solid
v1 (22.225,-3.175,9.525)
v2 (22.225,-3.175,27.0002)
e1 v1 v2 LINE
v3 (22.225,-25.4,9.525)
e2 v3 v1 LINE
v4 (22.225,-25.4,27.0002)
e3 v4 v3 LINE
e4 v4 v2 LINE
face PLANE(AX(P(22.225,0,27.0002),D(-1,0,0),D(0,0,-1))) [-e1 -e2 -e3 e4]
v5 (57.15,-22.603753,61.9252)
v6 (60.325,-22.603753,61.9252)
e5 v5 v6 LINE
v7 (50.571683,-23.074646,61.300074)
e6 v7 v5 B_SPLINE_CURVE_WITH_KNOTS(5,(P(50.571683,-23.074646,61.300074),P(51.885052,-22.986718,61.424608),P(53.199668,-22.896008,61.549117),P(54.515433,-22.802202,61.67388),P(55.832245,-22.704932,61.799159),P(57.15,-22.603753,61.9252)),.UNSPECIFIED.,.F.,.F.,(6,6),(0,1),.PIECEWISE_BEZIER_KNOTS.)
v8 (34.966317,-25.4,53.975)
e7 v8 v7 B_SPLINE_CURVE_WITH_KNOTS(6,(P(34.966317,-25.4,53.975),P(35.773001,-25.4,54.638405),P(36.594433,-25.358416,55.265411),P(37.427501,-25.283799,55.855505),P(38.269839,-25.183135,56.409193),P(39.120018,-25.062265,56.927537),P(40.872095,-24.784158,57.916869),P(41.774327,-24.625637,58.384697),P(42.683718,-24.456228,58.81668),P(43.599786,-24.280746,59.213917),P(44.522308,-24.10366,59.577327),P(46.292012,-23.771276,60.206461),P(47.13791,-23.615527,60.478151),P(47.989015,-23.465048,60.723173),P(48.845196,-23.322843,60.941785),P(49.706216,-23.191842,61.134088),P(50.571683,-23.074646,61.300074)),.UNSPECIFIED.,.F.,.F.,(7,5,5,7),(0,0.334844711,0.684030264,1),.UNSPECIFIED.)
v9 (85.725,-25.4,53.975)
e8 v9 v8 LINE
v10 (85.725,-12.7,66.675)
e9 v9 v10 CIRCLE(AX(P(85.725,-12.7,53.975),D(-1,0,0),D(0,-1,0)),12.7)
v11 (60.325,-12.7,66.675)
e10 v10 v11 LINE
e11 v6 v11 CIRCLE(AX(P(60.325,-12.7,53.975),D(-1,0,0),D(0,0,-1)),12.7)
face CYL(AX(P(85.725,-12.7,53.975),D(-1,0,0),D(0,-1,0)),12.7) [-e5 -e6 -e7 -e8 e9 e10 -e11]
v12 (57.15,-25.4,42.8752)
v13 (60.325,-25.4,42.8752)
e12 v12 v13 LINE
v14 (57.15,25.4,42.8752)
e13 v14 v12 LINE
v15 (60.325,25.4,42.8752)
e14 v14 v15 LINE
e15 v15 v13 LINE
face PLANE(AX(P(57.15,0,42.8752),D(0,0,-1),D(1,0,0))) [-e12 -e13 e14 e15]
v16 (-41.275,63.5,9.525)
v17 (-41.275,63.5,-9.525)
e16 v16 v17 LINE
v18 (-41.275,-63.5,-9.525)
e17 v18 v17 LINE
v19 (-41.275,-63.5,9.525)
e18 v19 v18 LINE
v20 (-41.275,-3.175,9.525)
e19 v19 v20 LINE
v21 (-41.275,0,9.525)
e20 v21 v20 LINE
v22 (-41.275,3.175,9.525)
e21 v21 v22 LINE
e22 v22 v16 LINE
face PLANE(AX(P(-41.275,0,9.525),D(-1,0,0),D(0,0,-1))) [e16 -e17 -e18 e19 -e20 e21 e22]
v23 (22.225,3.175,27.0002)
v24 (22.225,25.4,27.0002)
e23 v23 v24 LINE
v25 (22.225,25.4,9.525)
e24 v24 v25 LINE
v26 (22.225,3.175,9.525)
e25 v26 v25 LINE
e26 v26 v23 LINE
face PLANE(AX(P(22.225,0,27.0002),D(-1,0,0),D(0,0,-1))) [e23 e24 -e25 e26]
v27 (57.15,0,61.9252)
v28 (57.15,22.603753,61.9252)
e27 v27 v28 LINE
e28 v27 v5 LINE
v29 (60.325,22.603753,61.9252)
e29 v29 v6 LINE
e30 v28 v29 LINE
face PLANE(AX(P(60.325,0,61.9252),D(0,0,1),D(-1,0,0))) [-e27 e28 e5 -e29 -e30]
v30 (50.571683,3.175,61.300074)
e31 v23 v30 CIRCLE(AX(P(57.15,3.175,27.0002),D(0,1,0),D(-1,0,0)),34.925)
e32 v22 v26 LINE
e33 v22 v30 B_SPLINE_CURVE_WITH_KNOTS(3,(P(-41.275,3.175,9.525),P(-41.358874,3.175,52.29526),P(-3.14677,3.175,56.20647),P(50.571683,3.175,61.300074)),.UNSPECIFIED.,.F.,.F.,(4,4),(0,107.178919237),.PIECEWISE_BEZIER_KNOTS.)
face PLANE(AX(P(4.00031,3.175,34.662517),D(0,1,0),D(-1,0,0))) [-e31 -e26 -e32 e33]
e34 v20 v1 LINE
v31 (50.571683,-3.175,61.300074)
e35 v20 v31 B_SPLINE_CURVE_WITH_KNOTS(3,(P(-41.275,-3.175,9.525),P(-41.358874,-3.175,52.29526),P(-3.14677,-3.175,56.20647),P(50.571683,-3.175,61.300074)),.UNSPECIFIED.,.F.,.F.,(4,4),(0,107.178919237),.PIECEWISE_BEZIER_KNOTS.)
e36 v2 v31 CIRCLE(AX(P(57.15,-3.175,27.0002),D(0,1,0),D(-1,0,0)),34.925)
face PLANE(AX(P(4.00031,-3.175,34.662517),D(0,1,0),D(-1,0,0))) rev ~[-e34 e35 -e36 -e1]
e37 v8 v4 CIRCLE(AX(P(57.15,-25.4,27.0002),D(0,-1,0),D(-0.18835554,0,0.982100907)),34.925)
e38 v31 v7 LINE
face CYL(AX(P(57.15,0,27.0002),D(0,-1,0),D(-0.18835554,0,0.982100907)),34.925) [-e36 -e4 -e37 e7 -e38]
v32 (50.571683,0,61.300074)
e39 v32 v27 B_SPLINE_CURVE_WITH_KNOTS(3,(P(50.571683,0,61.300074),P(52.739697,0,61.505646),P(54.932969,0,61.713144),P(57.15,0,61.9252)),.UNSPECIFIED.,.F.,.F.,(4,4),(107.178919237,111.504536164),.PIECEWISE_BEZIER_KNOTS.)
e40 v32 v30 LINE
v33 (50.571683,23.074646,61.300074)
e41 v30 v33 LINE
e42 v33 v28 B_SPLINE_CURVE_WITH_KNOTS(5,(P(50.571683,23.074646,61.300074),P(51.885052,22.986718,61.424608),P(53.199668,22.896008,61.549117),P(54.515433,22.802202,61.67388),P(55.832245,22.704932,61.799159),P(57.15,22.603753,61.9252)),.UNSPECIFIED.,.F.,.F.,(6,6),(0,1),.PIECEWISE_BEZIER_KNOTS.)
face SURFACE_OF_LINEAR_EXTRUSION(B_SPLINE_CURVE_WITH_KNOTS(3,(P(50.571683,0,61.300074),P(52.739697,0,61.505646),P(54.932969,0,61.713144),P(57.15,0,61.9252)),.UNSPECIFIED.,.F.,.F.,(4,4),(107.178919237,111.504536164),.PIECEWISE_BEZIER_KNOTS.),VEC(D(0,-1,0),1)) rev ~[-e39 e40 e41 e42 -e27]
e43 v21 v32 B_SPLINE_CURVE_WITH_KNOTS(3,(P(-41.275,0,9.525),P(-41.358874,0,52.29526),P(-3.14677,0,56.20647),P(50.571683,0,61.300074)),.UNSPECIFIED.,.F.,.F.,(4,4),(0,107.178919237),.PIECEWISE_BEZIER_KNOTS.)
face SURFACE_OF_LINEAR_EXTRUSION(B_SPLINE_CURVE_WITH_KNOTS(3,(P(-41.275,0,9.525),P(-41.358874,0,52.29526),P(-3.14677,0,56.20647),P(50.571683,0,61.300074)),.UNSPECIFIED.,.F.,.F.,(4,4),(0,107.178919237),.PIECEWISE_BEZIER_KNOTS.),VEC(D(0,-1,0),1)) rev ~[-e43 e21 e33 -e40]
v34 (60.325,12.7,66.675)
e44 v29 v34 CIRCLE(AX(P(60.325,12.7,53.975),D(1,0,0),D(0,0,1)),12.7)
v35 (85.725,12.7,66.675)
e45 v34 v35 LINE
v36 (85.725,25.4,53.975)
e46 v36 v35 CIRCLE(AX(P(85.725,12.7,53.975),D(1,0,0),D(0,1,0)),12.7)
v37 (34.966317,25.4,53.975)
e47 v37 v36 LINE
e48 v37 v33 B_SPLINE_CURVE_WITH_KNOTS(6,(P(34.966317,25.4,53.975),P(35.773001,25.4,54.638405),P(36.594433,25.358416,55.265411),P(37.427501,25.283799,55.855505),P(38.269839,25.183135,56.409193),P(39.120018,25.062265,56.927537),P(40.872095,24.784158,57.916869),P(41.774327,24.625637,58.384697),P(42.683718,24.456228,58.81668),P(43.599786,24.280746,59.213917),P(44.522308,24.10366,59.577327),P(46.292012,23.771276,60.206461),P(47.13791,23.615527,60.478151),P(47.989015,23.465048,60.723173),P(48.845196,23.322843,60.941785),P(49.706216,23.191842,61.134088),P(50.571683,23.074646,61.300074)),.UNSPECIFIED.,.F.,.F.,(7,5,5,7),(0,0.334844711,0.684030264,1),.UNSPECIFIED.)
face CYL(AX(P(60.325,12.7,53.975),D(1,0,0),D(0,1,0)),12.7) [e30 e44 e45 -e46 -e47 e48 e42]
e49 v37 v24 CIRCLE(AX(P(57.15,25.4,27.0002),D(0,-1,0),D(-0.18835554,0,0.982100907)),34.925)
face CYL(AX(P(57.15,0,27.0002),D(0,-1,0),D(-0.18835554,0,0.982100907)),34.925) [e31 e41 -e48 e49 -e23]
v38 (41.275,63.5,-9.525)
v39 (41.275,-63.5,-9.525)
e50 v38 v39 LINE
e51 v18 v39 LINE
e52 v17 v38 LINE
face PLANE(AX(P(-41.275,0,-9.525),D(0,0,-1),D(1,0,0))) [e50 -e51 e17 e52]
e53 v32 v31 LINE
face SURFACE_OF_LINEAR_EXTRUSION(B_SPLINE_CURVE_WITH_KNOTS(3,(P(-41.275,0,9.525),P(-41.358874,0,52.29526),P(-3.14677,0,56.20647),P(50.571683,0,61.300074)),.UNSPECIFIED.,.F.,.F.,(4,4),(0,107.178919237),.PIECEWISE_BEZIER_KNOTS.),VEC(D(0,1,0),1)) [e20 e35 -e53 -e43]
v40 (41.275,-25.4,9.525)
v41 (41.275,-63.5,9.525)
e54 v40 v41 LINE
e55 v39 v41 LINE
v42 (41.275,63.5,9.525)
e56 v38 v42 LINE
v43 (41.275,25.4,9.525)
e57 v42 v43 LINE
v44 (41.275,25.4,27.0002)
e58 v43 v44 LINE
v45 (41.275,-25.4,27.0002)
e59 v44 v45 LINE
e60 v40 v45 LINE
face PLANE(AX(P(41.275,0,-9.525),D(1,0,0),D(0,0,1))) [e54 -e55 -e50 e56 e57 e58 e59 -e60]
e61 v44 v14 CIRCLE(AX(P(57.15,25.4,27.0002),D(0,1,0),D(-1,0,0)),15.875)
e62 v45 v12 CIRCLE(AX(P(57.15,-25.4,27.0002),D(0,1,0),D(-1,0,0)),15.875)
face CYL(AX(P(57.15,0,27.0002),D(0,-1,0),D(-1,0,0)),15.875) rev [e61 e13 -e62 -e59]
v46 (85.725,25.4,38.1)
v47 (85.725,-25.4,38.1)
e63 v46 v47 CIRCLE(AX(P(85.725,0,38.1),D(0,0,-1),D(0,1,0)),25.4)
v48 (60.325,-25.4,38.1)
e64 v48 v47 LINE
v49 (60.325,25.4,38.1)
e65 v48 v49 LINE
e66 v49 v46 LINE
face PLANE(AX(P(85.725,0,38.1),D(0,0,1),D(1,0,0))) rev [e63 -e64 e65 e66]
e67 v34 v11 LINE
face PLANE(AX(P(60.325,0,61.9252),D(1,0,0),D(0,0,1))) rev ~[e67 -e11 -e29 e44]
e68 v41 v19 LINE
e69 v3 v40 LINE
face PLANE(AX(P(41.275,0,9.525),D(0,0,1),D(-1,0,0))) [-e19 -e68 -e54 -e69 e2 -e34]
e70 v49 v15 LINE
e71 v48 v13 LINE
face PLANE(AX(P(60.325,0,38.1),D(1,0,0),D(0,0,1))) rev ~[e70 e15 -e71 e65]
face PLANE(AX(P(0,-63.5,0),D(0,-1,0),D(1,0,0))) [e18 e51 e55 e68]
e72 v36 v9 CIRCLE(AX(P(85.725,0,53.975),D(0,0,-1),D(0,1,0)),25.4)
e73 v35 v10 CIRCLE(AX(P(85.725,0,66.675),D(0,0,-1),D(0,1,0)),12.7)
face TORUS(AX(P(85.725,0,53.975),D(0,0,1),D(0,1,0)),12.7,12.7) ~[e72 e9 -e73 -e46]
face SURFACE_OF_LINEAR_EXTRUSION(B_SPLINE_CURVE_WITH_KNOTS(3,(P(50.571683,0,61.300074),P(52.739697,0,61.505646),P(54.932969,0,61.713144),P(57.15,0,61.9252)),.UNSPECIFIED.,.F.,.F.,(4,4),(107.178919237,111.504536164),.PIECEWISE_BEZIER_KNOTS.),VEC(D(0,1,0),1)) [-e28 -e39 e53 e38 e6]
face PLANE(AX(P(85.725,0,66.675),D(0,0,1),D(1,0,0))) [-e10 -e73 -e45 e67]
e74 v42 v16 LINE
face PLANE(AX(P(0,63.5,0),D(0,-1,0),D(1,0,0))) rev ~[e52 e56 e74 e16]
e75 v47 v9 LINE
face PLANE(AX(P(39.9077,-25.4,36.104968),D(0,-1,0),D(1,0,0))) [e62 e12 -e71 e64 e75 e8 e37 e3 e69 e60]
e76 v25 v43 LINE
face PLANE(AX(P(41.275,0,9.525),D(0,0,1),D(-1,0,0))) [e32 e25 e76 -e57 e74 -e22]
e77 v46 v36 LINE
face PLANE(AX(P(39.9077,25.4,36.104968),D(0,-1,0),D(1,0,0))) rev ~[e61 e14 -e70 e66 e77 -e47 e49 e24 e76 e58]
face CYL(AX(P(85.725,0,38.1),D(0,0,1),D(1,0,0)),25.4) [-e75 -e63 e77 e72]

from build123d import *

# Parameters (mm, degrees)
F1_DEPTH = 63.5
F0_W     = 25.4
F0_H     = 19.05
F0_H_2   = 4.7498
F0_H_3   = 4.7752
F2_DEPTH = 25.4
F4_DEPTH = 3.175
F5_R     = 12.7


with BuildPart() as f1:
    # F0 (on Front) → F1 (new body, symmetric)
    with BuildSketch(Plane.XZ):
        Polygon((-41.275, -9.525), (41.275, -9.525), (41.275, 9.525), (22.225, 9.525), (-41.275, 9.525), align=None)
    extrude(amount=F1_DEPTH, both=True)

    # F0 (on Front) → F2 (join, symmetric)
    with BuildSketch(Plane.XZ):
        with BuildLine():
            Line((22.225, 9.525), (41.275, 9.525))
            Line((41.275, 9.525), (41.275, 27.0002))
            ThreePointArc((41.275, 27.0002), (45.9246798487, 38.2255201513), (57.15, 42.8752))
            Line((57.15, 42.8752), (60.325, 42.8752))
            Line((60.325, 42.8752), (60.325, 61.9252))
            Line((60.325, 61.9252), (57.15, 61.9252))
            add(Edge.make_bspline(
                [(50.5716827733, 61.3000741611), (52.7396972635, 61.5056461021), (54.9329690535, 61.7131439678), (57.15, 61.9252)],
                knots=[107.178919237, 107.178919237, 107.178919237, 107.178919237, 111.5045361635, 111.5045361635, 111.5045361635, 111.5045361635], degree=3))
            ThreePointArc((50.5716827733, 61.3000741611), (30.2287876003, 49.2488841842), (22.225, 27.0002))
            Line((22.225, 27.0002), (22.225, 9.525))
        make_face()
        with Locations((73.025, 52.4002)):
            Rectangle(F0_W, F0_H)
        with Locations((73.025, 64.3001)):
            Rectangle(F0_W, F0_H_2)
        with Locations((73.025, 40.4876)):
            Rectangle(F0_W, F0_H_3)
    extrude(amount=F2_DEPTH, both=True)

    # F0 (on Front) → F3 (revolve)
    with BuildSketch(Plane.XZ):
        Polygon((85.725, 61.9252), (85.725, 42.8752), (85.725, 38.1), (111.125, 38.1), (111.125, 66.675), (85.725, 66.675), align=None)
    revolve(axis=Axis((85.725, 0, 52.3875), (0, 0, 1)))

    # F0 (on Front) → F4 (join, symmetric)
    with BuildSketch(Plane.XZ):
        with BuildLine():
            add(Edge.make_bspline(
                [(-41.275, 9.525), (-41.358874461, 52.2952599857), (-3.1467703164, 56.2064704424), (50.5716827733, 61.3000741611)],
                knots=[0, 0, 0, 0, 107.178919237, 107.178919237, 107.178919237, 107.178919237], degree=3))
            Line((-41.275, 9.525), (22.225, 9.525))
            Line((22.225, 9.525), (22.225, 27.0002))
            ThreePointArc((22.225, 27.0002), (30.2287876003, 49.2488841842), (50.5716827733, 61.3000741611))
        make_face()
    extrude(amount=F4_DEPTH, both=True)

    # F5
    f5_edges = [f1.edges().sort_by_distance(p)[0] for p in [
        (85.725, 25.4, 52.3875),
        (73.025, 25.4, 66.675),
        (73.025, -25.4, 66.675),
        (111.125, 0, 66.675),
    ]]
    fillet(f5_edges, radius=F5_R)


solid = f1.part
